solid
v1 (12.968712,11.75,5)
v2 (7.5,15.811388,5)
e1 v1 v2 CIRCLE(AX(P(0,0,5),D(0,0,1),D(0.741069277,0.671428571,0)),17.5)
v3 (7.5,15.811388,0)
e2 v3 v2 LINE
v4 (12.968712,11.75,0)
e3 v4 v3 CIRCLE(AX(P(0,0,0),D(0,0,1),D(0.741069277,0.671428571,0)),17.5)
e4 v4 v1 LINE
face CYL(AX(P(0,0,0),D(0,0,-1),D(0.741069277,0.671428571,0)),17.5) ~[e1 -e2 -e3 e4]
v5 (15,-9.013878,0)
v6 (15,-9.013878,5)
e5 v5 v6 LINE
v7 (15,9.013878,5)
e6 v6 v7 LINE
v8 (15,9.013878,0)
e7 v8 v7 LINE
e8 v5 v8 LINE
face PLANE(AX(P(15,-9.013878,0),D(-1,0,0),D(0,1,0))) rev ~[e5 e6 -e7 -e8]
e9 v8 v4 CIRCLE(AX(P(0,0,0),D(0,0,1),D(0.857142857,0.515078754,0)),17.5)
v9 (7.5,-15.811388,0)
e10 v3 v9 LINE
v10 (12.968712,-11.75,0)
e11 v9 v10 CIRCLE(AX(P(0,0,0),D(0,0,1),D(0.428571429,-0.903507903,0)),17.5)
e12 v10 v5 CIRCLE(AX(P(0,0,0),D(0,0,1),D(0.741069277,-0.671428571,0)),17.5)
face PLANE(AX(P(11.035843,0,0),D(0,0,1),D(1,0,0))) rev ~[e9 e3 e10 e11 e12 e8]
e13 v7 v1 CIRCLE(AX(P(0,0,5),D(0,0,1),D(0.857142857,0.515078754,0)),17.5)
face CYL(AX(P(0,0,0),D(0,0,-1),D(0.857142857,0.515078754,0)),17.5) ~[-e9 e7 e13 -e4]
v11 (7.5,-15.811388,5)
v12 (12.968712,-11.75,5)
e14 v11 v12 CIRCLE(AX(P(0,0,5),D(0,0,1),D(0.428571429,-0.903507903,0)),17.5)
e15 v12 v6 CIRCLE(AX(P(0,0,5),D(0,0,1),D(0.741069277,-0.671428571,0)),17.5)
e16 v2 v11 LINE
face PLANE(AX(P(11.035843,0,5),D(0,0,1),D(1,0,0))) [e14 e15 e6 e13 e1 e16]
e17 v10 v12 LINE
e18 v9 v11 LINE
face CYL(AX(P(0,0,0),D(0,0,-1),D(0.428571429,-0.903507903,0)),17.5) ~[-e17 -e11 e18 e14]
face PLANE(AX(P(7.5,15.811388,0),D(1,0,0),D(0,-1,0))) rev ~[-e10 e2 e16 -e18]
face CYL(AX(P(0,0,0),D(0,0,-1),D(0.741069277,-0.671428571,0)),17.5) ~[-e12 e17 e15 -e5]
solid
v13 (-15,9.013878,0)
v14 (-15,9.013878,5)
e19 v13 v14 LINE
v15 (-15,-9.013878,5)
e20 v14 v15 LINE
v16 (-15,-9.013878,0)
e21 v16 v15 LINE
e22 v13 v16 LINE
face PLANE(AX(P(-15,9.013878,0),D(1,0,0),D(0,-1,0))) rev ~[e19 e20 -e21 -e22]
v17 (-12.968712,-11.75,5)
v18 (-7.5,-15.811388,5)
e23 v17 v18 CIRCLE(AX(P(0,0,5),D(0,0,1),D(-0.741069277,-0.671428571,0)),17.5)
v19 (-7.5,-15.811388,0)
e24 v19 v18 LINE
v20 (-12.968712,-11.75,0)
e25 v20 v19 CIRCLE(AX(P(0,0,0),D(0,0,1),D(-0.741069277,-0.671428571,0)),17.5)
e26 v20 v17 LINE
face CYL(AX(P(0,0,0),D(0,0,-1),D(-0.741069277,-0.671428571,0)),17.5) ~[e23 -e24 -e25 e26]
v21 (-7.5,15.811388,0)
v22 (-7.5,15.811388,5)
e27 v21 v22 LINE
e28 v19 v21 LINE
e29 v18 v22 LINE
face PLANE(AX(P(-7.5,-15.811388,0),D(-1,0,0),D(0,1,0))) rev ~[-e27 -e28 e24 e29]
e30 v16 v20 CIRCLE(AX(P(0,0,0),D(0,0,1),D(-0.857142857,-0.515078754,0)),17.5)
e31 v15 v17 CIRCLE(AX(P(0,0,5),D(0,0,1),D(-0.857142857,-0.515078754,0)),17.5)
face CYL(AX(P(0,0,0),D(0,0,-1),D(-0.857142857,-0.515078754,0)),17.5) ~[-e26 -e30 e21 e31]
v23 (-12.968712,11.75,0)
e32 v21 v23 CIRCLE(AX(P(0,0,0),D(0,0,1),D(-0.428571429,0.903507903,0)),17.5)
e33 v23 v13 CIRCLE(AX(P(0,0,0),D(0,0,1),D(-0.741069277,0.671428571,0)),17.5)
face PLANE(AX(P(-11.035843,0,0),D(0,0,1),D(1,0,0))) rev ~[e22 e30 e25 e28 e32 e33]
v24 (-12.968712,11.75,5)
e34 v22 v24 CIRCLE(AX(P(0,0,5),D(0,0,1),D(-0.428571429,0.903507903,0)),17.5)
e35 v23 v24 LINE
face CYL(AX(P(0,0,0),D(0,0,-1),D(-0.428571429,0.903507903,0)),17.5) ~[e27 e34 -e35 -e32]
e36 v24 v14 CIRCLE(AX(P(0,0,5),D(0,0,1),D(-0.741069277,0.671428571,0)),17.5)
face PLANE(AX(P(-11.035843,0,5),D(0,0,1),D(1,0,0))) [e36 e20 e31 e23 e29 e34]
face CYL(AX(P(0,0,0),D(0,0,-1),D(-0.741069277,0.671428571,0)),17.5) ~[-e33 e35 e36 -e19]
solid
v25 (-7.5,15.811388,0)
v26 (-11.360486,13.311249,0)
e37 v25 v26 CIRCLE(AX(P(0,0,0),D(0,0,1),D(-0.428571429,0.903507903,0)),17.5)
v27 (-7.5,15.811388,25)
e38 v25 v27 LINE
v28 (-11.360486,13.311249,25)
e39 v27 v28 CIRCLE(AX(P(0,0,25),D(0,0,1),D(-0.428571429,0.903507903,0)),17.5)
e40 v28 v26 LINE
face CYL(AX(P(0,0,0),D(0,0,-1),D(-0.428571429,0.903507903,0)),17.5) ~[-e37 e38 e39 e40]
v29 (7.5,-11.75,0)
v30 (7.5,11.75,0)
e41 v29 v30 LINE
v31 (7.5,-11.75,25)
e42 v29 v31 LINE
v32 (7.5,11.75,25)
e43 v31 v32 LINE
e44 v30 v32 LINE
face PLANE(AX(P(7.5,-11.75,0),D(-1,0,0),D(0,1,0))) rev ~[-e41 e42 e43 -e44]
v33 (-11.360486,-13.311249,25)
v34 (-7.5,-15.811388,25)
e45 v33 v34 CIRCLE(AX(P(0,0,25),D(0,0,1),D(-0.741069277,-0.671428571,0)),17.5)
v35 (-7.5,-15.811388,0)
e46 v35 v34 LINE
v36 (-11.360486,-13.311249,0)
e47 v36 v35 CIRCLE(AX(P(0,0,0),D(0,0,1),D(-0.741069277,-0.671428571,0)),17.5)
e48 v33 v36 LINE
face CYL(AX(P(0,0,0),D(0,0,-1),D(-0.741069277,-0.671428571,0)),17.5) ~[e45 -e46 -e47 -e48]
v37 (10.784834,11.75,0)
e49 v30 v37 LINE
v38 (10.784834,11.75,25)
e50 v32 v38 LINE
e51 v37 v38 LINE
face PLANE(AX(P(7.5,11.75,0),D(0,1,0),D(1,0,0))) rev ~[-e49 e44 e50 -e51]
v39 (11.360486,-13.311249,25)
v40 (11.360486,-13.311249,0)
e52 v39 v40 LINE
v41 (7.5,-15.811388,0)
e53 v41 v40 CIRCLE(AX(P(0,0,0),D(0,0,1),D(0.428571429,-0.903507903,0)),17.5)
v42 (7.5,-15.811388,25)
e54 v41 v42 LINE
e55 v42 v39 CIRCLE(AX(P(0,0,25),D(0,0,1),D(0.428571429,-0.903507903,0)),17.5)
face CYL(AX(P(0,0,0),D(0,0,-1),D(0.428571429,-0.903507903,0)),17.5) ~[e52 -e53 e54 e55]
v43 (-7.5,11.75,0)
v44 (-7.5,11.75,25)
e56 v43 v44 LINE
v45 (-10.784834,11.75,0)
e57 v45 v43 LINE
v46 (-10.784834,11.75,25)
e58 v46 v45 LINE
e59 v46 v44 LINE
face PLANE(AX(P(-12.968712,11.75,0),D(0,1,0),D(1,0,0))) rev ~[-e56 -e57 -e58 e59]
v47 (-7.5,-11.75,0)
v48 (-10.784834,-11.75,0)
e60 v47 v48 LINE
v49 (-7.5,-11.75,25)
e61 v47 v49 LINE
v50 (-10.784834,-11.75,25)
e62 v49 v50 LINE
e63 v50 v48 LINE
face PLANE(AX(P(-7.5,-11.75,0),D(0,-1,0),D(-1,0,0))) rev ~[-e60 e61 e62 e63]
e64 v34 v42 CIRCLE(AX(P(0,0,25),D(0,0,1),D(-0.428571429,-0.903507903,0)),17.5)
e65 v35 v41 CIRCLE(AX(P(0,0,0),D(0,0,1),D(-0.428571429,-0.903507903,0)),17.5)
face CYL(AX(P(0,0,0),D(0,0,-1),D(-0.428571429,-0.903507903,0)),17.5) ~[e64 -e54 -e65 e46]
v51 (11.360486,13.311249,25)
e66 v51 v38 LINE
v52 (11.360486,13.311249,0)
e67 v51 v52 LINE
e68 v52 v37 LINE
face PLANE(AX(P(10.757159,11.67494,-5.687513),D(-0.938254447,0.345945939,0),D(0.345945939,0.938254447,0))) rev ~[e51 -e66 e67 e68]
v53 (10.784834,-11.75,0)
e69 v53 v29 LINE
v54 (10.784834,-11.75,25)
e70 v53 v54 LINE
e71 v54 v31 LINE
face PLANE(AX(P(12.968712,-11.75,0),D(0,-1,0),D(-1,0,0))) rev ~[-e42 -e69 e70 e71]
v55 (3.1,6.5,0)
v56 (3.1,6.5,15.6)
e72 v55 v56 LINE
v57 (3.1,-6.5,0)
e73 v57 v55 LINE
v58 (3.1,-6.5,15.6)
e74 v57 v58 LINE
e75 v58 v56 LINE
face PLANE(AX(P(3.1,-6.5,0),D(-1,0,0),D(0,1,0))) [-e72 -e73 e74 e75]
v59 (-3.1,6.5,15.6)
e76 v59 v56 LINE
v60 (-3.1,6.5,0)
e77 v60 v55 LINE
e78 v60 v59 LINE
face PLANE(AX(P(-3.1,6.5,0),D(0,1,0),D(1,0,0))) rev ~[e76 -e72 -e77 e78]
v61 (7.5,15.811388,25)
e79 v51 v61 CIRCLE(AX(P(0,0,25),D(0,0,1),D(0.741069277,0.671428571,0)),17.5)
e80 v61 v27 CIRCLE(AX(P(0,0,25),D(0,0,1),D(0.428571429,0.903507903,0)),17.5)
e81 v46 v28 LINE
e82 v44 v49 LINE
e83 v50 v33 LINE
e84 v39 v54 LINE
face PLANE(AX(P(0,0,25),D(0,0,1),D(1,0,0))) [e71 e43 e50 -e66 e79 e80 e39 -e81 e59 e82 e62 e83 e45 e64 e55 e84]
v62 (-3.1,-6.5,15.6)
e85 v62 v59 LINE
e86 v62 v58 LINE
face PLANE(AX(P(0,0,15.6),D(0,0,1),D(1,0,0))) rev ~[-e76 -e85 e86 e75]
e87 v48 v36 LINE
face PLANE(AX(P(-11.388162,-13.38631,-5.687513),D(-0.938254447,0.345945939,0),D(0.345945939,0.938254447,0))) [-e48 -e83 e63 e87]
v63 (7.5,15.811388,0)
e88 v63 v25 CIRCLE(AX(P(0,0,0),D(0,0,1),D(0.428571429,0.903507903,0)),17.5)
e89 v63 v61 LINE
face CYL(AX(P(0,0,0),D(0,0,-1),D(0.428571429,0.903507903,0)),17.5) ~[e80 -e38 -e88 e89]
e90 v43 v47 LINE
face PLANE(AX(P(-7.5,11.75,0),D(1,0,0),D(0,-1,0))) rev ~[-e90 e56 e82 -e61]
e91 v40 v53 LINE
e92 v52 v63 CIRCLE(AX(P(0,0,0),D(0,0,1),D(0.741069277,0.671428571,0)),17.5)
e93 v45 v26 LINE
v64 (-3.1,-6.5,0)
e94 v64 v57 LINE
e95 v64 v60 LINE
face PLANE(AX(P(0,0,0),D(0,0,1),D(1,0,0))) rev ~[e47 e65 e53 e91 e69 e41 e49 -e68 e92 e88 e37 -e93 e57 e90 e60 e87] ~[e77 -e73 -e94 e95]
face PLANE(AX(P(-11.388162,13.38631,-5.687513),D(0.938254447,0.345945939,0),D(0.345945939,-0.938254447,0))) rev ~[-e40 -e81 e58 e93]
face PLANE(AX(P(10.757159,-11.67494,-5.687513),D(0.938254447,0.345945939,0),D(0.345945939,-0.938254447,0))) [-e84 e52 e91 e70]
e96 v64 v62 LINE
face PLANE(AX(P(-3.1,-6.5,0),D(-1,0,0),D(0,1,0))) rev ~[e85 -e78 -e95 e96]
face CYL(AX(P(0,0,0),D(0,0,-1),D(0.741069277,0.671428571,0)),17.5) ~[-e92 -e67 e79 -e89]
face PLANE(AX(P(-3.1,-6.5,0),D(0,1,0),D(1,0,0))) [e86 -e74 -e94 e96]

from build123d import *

# Parameters (mm, degrees)
F1_DEPTH    = 5
F0_W        = 15
F0_H        = 23.5
F0_W_2      = 6.2
F0_H_2      = 13
F2_DEPTH    = 25
F3_DEPTH    = 15.6
F4_T1_DEPTH = 36.3750267574


# Not quite as in the source:
# - a fillet or chamfer that OpenCascade refuses, or shapes differently, is made with other operations: its cross-section is extruded or revolved along the edge and cut away or added
# - a feature names something its author has since deleted; it is built from what else it names


with BuildPart() as f1:
    # F0 (on Top) → F1 (new body)
    with BuildSketch(Plane.XY):
        with BuildLine():
            Line((15, -9.0138781887), (15, 9.0138781887))
            ThreePointArc((15, 9.0138781887), (14.0511141288, 10.4314999755), (12.9687123493, 11.75))
            Line((12.9687123493, 11.75), (7.5, 11.75))
            Line((7.5, 11.75), (7.5, -11.75))
            Line((7.5, -11.75), (12.9687123493, -11.75))
            ThreePointArc((12.9687123493, -11.75), (14.0511141288, -10.4314999755), (15, -9.0138781887))
        make_face()
        with BuildLine():
            ThreePointArc((7.5, -15.8113883008), (10.4338758399, -14.0493499834), (12.9687123493, -11.75))
            Line((12.9687123493, -11.75), (7.5, -11.75))
            Line((7.5, -11.75), (7.5, -15.8113883008))
        make_face()
        with BuildLine():
            Line((7.5, 11.75), (12.9687123493, 11.75))
            ThreePointArc((12.9687123493, 11.75), (10.4338758399, 14.0493499834), (7.5, 15.8113883008))
            Line((7.5, 15.8113883008), (7.5, 11.75))
        make_face()
    extrude(amount=F1_DEPTH)


with BuildPart() as f1b:
    # F0 (on Top) → F1, piece 2 (new body)
    with BuildSketch(Plane.XY):
        with BuildLine():
            Line((-7.5, -11.75), (-7.5, 11.75))
            Line((-7.5, 11.75), (-12.9687123493, 11.75))
            ThreePointArc((-12.9687123493, 11.75), (-14.0511141288, 10.4314999755), (-15, 9.0138781887))
            Line((-15, 9.0138781887), (-15, -9.0138781887))
            ThreePointArc((-15, -9.0138781887), (-14.0511141288, -10.4314999755), (-12.9687123493, -11.75))
            Line((-12.9687123493, -11.75), (-7.5, -11.75))
        make_face()
        with BuildLine():
            Line((-7.5, 11.75), (-7.5, 15.8113883008))
            ThreePointArc((-7.5, 15.8113883008), (-10.4338758399, 14.0493499834), (-12.9687123493, 11.75))
            Line((-12.9687123493, 11.75), (-7.5, 11.75))
        make_face()
        with BuildLine():
            ThreePointArc((-12.9687123493, -11.75), (-10.4338758399, -14.0493499834), (-7.5, -15.8113883008))
            Line((-7.5, -15.8113883008), (-7.5, -11.75))
            Line((-7.5, -11.75), (-12.9687123493, -11.75))
        make_face()
    extrude(amount=F1_DEPTH)


with BuildPart() as f2:
    # F0 (on Top) → F2 (new body)
    with BuildSketch(Plane.XY):
        Rectangle(F0_W, F0_H)
        Rectangle(F0_W_2, F0_H_2, mode=Mode.SUBTRACT)
        Rectangle(F0_W_2, F0_H_2)
        with BuildLine():
            Line((7.5, 11.75), (7.5, 15.8113883008))
            ThreePointArc((7.5, 15.8113883008), (0, 17.5), (-7.5, 15.8113883008))
            Line((-7.5, 15.8113883008), (-7.5, 11.75))
            Line((-7.5, 11.75), (7.5, 11.75))
        make_face()
        with BuildLine():
            ThreePointArc((-7.5, -15.8113883008), (0, -17.5), (7.5, -15.8113883008))
            Line((7.5, -15.8113883008), (7.5, -11.75))
            Line((7.5, -11.75), (-7.5, -11.75))
            Line((-7.5, -11.75), (-7.5, -15.8113883008))
        make_face()
        with BuildLine():
            ThreePointArc((-12.9687123493, -11.75), (-10.4338758399, -14.0493499834), (-7.5, -15.8113883008))
            Line((-7.5, -15.8113883008), (-7.5, -11.75))
            Line((-7.5, -11.75), (-12.9687123493, -11.75))
        make_face()
        with BuildLine():
            Line((-7.5, 11.75), (-7.5, 15.8113883008))
            ThreePointArc((-7.5, 15.8113883008), (-10.4338758399, 14.0493499834), (-12.9687123493, 11.75))
            Line((-12.9687123493, 11.75), (-7.5, 11.75))
        make_face()
        with BuildLine():
            Line((7.5, 11.75), (12.9687123493, 11.75))
            ThreePointArc((12.9687123493, 11.75), (10.4338758399, 14.0493499834), (7.5, 15.8113883008))
            Line((7.5, 15.8113883008), (7.5, 11.75))
        make_face()
        with BuildLine():
            ThreePointArc((7.5, -15.8113883008), (10.4338758399, -14.0493499834), (12.9687123493, -11.75))
            Line((12.9687123493, -11.75), (7.5, -11.75))
            Line((7.5, -11.75), (7.5, -15.8113883008))
        make_face()
    extrude(amount=F2_DEPTH)

    # F0 (on Top) → F3 (cut)
    with BuildSketch(Plane.XY):
        Rectangle(F0_W_2, F0_H_2)
    extrude(amount=F3_DEPTH, mode=Mode.SUBTRACT)

    # F4: chamfer of 2 on 4 edges, made by hand

    # F4_s2 → F4_t1 (cut)
    with BuildSketch(Plane.XY.offset(-5.6875133787)):
        with BuildLine():
            Line((-11.3881617362, -13.3863096005), (-10.7571586121, -11.6749396443))
            Line((-10.7571586121, -11.6749396443), (-10.7571586121, -11.6349396443))
            ThreePointArc((-10.7571586121, -11.6349396443), (-11.8629354807, -11.71), (-12.9687123493, -11.71))
            Line((-12.9687123493, -11.71), (-12.9983551204, -11.7768571429))
            ThreePointArc((-12.9983551204, -11.7768571429), (-12.2058182488, -12.5964122224), (-11.4141285615, -13.4167353131))
            Line((-11.4141285615, -13.4167353131), (-11.3881617362, -13.3863096005))
        make_face()
        with BuildLine():
            Line((10.7571586121, -11.6749396443), (11.3881617362, -13.3863096005))
            Line((11.3881617362, -13.3863096005), (11.4141285615, -13.4167353131))
            ThreePointArc((11.4141285615, -13.4167353131), (12.2058182488, -12.5964122224), (12.9983551204, -11.7768571429))
            Line((12.9983551204, -11.7768571429), (12.9687123493, -11.71))
            ThreePointArc((12.9687123493, -11.71), (11.8629354807, -11.71), (10.7571586121, -11.6349396443))
            Line((10.7571586121, -11.6349396443), (10.7571586121, -11.6749396443))
        make_face()
        with BuildLine():
            Line((10.7571586121, 11.6749396443), (11.3881617362, 13.3863096005))
            Line((11.3881617362, 13.3863096005), (11.4141285615, 13.4167353131))
            ThreePointArc((11.4141285615, 13.4167353131), (12.2058182488, 12.5964122224), (12.9983551204, 11.7768571429))
            Line((12.9983551204, 11.7768571429), (12.9687123493, 11.71))
            ThreePointArc((12.9687123493, 11.71), (11.8629354807, 11.71), (10.7571586121, 11.6349396443))
            Line((10.7571586121, 11.6349396443), (10.7571586121, 11.6749396443))
        make_face()
        with BuildLine():
            Line((-11.3881617362, 13.3863096005), (-10.7571586121, 11.6749396443))
            Line((-10.7571586121, 11.6749396443), (-10.7571586121, 11.6349396443))
            ThreePointArc((-10.7571586121, 11.6349396443), (-11.8629354807, 11.71), (-12.9687123493, 11.71))
            Line((-12.9687123493, 11.71), (-12.9983551204, 11.7768571429))
            ThreePointArc((-12.9983551204, 11.7768571429), (-12.2058182488, 12.5964122224), (-11.4141285615, 13.4167353131))
            Line((-11.4141285615, 13.4167353131), (-11.3881617362, 13.3863096005))
        make_face()
    extrude(amount=F4_T1_DEPTH, mode=Mode.SUBTRACT)


solid = Compound([f1.part, f1b.part, f2.part])
